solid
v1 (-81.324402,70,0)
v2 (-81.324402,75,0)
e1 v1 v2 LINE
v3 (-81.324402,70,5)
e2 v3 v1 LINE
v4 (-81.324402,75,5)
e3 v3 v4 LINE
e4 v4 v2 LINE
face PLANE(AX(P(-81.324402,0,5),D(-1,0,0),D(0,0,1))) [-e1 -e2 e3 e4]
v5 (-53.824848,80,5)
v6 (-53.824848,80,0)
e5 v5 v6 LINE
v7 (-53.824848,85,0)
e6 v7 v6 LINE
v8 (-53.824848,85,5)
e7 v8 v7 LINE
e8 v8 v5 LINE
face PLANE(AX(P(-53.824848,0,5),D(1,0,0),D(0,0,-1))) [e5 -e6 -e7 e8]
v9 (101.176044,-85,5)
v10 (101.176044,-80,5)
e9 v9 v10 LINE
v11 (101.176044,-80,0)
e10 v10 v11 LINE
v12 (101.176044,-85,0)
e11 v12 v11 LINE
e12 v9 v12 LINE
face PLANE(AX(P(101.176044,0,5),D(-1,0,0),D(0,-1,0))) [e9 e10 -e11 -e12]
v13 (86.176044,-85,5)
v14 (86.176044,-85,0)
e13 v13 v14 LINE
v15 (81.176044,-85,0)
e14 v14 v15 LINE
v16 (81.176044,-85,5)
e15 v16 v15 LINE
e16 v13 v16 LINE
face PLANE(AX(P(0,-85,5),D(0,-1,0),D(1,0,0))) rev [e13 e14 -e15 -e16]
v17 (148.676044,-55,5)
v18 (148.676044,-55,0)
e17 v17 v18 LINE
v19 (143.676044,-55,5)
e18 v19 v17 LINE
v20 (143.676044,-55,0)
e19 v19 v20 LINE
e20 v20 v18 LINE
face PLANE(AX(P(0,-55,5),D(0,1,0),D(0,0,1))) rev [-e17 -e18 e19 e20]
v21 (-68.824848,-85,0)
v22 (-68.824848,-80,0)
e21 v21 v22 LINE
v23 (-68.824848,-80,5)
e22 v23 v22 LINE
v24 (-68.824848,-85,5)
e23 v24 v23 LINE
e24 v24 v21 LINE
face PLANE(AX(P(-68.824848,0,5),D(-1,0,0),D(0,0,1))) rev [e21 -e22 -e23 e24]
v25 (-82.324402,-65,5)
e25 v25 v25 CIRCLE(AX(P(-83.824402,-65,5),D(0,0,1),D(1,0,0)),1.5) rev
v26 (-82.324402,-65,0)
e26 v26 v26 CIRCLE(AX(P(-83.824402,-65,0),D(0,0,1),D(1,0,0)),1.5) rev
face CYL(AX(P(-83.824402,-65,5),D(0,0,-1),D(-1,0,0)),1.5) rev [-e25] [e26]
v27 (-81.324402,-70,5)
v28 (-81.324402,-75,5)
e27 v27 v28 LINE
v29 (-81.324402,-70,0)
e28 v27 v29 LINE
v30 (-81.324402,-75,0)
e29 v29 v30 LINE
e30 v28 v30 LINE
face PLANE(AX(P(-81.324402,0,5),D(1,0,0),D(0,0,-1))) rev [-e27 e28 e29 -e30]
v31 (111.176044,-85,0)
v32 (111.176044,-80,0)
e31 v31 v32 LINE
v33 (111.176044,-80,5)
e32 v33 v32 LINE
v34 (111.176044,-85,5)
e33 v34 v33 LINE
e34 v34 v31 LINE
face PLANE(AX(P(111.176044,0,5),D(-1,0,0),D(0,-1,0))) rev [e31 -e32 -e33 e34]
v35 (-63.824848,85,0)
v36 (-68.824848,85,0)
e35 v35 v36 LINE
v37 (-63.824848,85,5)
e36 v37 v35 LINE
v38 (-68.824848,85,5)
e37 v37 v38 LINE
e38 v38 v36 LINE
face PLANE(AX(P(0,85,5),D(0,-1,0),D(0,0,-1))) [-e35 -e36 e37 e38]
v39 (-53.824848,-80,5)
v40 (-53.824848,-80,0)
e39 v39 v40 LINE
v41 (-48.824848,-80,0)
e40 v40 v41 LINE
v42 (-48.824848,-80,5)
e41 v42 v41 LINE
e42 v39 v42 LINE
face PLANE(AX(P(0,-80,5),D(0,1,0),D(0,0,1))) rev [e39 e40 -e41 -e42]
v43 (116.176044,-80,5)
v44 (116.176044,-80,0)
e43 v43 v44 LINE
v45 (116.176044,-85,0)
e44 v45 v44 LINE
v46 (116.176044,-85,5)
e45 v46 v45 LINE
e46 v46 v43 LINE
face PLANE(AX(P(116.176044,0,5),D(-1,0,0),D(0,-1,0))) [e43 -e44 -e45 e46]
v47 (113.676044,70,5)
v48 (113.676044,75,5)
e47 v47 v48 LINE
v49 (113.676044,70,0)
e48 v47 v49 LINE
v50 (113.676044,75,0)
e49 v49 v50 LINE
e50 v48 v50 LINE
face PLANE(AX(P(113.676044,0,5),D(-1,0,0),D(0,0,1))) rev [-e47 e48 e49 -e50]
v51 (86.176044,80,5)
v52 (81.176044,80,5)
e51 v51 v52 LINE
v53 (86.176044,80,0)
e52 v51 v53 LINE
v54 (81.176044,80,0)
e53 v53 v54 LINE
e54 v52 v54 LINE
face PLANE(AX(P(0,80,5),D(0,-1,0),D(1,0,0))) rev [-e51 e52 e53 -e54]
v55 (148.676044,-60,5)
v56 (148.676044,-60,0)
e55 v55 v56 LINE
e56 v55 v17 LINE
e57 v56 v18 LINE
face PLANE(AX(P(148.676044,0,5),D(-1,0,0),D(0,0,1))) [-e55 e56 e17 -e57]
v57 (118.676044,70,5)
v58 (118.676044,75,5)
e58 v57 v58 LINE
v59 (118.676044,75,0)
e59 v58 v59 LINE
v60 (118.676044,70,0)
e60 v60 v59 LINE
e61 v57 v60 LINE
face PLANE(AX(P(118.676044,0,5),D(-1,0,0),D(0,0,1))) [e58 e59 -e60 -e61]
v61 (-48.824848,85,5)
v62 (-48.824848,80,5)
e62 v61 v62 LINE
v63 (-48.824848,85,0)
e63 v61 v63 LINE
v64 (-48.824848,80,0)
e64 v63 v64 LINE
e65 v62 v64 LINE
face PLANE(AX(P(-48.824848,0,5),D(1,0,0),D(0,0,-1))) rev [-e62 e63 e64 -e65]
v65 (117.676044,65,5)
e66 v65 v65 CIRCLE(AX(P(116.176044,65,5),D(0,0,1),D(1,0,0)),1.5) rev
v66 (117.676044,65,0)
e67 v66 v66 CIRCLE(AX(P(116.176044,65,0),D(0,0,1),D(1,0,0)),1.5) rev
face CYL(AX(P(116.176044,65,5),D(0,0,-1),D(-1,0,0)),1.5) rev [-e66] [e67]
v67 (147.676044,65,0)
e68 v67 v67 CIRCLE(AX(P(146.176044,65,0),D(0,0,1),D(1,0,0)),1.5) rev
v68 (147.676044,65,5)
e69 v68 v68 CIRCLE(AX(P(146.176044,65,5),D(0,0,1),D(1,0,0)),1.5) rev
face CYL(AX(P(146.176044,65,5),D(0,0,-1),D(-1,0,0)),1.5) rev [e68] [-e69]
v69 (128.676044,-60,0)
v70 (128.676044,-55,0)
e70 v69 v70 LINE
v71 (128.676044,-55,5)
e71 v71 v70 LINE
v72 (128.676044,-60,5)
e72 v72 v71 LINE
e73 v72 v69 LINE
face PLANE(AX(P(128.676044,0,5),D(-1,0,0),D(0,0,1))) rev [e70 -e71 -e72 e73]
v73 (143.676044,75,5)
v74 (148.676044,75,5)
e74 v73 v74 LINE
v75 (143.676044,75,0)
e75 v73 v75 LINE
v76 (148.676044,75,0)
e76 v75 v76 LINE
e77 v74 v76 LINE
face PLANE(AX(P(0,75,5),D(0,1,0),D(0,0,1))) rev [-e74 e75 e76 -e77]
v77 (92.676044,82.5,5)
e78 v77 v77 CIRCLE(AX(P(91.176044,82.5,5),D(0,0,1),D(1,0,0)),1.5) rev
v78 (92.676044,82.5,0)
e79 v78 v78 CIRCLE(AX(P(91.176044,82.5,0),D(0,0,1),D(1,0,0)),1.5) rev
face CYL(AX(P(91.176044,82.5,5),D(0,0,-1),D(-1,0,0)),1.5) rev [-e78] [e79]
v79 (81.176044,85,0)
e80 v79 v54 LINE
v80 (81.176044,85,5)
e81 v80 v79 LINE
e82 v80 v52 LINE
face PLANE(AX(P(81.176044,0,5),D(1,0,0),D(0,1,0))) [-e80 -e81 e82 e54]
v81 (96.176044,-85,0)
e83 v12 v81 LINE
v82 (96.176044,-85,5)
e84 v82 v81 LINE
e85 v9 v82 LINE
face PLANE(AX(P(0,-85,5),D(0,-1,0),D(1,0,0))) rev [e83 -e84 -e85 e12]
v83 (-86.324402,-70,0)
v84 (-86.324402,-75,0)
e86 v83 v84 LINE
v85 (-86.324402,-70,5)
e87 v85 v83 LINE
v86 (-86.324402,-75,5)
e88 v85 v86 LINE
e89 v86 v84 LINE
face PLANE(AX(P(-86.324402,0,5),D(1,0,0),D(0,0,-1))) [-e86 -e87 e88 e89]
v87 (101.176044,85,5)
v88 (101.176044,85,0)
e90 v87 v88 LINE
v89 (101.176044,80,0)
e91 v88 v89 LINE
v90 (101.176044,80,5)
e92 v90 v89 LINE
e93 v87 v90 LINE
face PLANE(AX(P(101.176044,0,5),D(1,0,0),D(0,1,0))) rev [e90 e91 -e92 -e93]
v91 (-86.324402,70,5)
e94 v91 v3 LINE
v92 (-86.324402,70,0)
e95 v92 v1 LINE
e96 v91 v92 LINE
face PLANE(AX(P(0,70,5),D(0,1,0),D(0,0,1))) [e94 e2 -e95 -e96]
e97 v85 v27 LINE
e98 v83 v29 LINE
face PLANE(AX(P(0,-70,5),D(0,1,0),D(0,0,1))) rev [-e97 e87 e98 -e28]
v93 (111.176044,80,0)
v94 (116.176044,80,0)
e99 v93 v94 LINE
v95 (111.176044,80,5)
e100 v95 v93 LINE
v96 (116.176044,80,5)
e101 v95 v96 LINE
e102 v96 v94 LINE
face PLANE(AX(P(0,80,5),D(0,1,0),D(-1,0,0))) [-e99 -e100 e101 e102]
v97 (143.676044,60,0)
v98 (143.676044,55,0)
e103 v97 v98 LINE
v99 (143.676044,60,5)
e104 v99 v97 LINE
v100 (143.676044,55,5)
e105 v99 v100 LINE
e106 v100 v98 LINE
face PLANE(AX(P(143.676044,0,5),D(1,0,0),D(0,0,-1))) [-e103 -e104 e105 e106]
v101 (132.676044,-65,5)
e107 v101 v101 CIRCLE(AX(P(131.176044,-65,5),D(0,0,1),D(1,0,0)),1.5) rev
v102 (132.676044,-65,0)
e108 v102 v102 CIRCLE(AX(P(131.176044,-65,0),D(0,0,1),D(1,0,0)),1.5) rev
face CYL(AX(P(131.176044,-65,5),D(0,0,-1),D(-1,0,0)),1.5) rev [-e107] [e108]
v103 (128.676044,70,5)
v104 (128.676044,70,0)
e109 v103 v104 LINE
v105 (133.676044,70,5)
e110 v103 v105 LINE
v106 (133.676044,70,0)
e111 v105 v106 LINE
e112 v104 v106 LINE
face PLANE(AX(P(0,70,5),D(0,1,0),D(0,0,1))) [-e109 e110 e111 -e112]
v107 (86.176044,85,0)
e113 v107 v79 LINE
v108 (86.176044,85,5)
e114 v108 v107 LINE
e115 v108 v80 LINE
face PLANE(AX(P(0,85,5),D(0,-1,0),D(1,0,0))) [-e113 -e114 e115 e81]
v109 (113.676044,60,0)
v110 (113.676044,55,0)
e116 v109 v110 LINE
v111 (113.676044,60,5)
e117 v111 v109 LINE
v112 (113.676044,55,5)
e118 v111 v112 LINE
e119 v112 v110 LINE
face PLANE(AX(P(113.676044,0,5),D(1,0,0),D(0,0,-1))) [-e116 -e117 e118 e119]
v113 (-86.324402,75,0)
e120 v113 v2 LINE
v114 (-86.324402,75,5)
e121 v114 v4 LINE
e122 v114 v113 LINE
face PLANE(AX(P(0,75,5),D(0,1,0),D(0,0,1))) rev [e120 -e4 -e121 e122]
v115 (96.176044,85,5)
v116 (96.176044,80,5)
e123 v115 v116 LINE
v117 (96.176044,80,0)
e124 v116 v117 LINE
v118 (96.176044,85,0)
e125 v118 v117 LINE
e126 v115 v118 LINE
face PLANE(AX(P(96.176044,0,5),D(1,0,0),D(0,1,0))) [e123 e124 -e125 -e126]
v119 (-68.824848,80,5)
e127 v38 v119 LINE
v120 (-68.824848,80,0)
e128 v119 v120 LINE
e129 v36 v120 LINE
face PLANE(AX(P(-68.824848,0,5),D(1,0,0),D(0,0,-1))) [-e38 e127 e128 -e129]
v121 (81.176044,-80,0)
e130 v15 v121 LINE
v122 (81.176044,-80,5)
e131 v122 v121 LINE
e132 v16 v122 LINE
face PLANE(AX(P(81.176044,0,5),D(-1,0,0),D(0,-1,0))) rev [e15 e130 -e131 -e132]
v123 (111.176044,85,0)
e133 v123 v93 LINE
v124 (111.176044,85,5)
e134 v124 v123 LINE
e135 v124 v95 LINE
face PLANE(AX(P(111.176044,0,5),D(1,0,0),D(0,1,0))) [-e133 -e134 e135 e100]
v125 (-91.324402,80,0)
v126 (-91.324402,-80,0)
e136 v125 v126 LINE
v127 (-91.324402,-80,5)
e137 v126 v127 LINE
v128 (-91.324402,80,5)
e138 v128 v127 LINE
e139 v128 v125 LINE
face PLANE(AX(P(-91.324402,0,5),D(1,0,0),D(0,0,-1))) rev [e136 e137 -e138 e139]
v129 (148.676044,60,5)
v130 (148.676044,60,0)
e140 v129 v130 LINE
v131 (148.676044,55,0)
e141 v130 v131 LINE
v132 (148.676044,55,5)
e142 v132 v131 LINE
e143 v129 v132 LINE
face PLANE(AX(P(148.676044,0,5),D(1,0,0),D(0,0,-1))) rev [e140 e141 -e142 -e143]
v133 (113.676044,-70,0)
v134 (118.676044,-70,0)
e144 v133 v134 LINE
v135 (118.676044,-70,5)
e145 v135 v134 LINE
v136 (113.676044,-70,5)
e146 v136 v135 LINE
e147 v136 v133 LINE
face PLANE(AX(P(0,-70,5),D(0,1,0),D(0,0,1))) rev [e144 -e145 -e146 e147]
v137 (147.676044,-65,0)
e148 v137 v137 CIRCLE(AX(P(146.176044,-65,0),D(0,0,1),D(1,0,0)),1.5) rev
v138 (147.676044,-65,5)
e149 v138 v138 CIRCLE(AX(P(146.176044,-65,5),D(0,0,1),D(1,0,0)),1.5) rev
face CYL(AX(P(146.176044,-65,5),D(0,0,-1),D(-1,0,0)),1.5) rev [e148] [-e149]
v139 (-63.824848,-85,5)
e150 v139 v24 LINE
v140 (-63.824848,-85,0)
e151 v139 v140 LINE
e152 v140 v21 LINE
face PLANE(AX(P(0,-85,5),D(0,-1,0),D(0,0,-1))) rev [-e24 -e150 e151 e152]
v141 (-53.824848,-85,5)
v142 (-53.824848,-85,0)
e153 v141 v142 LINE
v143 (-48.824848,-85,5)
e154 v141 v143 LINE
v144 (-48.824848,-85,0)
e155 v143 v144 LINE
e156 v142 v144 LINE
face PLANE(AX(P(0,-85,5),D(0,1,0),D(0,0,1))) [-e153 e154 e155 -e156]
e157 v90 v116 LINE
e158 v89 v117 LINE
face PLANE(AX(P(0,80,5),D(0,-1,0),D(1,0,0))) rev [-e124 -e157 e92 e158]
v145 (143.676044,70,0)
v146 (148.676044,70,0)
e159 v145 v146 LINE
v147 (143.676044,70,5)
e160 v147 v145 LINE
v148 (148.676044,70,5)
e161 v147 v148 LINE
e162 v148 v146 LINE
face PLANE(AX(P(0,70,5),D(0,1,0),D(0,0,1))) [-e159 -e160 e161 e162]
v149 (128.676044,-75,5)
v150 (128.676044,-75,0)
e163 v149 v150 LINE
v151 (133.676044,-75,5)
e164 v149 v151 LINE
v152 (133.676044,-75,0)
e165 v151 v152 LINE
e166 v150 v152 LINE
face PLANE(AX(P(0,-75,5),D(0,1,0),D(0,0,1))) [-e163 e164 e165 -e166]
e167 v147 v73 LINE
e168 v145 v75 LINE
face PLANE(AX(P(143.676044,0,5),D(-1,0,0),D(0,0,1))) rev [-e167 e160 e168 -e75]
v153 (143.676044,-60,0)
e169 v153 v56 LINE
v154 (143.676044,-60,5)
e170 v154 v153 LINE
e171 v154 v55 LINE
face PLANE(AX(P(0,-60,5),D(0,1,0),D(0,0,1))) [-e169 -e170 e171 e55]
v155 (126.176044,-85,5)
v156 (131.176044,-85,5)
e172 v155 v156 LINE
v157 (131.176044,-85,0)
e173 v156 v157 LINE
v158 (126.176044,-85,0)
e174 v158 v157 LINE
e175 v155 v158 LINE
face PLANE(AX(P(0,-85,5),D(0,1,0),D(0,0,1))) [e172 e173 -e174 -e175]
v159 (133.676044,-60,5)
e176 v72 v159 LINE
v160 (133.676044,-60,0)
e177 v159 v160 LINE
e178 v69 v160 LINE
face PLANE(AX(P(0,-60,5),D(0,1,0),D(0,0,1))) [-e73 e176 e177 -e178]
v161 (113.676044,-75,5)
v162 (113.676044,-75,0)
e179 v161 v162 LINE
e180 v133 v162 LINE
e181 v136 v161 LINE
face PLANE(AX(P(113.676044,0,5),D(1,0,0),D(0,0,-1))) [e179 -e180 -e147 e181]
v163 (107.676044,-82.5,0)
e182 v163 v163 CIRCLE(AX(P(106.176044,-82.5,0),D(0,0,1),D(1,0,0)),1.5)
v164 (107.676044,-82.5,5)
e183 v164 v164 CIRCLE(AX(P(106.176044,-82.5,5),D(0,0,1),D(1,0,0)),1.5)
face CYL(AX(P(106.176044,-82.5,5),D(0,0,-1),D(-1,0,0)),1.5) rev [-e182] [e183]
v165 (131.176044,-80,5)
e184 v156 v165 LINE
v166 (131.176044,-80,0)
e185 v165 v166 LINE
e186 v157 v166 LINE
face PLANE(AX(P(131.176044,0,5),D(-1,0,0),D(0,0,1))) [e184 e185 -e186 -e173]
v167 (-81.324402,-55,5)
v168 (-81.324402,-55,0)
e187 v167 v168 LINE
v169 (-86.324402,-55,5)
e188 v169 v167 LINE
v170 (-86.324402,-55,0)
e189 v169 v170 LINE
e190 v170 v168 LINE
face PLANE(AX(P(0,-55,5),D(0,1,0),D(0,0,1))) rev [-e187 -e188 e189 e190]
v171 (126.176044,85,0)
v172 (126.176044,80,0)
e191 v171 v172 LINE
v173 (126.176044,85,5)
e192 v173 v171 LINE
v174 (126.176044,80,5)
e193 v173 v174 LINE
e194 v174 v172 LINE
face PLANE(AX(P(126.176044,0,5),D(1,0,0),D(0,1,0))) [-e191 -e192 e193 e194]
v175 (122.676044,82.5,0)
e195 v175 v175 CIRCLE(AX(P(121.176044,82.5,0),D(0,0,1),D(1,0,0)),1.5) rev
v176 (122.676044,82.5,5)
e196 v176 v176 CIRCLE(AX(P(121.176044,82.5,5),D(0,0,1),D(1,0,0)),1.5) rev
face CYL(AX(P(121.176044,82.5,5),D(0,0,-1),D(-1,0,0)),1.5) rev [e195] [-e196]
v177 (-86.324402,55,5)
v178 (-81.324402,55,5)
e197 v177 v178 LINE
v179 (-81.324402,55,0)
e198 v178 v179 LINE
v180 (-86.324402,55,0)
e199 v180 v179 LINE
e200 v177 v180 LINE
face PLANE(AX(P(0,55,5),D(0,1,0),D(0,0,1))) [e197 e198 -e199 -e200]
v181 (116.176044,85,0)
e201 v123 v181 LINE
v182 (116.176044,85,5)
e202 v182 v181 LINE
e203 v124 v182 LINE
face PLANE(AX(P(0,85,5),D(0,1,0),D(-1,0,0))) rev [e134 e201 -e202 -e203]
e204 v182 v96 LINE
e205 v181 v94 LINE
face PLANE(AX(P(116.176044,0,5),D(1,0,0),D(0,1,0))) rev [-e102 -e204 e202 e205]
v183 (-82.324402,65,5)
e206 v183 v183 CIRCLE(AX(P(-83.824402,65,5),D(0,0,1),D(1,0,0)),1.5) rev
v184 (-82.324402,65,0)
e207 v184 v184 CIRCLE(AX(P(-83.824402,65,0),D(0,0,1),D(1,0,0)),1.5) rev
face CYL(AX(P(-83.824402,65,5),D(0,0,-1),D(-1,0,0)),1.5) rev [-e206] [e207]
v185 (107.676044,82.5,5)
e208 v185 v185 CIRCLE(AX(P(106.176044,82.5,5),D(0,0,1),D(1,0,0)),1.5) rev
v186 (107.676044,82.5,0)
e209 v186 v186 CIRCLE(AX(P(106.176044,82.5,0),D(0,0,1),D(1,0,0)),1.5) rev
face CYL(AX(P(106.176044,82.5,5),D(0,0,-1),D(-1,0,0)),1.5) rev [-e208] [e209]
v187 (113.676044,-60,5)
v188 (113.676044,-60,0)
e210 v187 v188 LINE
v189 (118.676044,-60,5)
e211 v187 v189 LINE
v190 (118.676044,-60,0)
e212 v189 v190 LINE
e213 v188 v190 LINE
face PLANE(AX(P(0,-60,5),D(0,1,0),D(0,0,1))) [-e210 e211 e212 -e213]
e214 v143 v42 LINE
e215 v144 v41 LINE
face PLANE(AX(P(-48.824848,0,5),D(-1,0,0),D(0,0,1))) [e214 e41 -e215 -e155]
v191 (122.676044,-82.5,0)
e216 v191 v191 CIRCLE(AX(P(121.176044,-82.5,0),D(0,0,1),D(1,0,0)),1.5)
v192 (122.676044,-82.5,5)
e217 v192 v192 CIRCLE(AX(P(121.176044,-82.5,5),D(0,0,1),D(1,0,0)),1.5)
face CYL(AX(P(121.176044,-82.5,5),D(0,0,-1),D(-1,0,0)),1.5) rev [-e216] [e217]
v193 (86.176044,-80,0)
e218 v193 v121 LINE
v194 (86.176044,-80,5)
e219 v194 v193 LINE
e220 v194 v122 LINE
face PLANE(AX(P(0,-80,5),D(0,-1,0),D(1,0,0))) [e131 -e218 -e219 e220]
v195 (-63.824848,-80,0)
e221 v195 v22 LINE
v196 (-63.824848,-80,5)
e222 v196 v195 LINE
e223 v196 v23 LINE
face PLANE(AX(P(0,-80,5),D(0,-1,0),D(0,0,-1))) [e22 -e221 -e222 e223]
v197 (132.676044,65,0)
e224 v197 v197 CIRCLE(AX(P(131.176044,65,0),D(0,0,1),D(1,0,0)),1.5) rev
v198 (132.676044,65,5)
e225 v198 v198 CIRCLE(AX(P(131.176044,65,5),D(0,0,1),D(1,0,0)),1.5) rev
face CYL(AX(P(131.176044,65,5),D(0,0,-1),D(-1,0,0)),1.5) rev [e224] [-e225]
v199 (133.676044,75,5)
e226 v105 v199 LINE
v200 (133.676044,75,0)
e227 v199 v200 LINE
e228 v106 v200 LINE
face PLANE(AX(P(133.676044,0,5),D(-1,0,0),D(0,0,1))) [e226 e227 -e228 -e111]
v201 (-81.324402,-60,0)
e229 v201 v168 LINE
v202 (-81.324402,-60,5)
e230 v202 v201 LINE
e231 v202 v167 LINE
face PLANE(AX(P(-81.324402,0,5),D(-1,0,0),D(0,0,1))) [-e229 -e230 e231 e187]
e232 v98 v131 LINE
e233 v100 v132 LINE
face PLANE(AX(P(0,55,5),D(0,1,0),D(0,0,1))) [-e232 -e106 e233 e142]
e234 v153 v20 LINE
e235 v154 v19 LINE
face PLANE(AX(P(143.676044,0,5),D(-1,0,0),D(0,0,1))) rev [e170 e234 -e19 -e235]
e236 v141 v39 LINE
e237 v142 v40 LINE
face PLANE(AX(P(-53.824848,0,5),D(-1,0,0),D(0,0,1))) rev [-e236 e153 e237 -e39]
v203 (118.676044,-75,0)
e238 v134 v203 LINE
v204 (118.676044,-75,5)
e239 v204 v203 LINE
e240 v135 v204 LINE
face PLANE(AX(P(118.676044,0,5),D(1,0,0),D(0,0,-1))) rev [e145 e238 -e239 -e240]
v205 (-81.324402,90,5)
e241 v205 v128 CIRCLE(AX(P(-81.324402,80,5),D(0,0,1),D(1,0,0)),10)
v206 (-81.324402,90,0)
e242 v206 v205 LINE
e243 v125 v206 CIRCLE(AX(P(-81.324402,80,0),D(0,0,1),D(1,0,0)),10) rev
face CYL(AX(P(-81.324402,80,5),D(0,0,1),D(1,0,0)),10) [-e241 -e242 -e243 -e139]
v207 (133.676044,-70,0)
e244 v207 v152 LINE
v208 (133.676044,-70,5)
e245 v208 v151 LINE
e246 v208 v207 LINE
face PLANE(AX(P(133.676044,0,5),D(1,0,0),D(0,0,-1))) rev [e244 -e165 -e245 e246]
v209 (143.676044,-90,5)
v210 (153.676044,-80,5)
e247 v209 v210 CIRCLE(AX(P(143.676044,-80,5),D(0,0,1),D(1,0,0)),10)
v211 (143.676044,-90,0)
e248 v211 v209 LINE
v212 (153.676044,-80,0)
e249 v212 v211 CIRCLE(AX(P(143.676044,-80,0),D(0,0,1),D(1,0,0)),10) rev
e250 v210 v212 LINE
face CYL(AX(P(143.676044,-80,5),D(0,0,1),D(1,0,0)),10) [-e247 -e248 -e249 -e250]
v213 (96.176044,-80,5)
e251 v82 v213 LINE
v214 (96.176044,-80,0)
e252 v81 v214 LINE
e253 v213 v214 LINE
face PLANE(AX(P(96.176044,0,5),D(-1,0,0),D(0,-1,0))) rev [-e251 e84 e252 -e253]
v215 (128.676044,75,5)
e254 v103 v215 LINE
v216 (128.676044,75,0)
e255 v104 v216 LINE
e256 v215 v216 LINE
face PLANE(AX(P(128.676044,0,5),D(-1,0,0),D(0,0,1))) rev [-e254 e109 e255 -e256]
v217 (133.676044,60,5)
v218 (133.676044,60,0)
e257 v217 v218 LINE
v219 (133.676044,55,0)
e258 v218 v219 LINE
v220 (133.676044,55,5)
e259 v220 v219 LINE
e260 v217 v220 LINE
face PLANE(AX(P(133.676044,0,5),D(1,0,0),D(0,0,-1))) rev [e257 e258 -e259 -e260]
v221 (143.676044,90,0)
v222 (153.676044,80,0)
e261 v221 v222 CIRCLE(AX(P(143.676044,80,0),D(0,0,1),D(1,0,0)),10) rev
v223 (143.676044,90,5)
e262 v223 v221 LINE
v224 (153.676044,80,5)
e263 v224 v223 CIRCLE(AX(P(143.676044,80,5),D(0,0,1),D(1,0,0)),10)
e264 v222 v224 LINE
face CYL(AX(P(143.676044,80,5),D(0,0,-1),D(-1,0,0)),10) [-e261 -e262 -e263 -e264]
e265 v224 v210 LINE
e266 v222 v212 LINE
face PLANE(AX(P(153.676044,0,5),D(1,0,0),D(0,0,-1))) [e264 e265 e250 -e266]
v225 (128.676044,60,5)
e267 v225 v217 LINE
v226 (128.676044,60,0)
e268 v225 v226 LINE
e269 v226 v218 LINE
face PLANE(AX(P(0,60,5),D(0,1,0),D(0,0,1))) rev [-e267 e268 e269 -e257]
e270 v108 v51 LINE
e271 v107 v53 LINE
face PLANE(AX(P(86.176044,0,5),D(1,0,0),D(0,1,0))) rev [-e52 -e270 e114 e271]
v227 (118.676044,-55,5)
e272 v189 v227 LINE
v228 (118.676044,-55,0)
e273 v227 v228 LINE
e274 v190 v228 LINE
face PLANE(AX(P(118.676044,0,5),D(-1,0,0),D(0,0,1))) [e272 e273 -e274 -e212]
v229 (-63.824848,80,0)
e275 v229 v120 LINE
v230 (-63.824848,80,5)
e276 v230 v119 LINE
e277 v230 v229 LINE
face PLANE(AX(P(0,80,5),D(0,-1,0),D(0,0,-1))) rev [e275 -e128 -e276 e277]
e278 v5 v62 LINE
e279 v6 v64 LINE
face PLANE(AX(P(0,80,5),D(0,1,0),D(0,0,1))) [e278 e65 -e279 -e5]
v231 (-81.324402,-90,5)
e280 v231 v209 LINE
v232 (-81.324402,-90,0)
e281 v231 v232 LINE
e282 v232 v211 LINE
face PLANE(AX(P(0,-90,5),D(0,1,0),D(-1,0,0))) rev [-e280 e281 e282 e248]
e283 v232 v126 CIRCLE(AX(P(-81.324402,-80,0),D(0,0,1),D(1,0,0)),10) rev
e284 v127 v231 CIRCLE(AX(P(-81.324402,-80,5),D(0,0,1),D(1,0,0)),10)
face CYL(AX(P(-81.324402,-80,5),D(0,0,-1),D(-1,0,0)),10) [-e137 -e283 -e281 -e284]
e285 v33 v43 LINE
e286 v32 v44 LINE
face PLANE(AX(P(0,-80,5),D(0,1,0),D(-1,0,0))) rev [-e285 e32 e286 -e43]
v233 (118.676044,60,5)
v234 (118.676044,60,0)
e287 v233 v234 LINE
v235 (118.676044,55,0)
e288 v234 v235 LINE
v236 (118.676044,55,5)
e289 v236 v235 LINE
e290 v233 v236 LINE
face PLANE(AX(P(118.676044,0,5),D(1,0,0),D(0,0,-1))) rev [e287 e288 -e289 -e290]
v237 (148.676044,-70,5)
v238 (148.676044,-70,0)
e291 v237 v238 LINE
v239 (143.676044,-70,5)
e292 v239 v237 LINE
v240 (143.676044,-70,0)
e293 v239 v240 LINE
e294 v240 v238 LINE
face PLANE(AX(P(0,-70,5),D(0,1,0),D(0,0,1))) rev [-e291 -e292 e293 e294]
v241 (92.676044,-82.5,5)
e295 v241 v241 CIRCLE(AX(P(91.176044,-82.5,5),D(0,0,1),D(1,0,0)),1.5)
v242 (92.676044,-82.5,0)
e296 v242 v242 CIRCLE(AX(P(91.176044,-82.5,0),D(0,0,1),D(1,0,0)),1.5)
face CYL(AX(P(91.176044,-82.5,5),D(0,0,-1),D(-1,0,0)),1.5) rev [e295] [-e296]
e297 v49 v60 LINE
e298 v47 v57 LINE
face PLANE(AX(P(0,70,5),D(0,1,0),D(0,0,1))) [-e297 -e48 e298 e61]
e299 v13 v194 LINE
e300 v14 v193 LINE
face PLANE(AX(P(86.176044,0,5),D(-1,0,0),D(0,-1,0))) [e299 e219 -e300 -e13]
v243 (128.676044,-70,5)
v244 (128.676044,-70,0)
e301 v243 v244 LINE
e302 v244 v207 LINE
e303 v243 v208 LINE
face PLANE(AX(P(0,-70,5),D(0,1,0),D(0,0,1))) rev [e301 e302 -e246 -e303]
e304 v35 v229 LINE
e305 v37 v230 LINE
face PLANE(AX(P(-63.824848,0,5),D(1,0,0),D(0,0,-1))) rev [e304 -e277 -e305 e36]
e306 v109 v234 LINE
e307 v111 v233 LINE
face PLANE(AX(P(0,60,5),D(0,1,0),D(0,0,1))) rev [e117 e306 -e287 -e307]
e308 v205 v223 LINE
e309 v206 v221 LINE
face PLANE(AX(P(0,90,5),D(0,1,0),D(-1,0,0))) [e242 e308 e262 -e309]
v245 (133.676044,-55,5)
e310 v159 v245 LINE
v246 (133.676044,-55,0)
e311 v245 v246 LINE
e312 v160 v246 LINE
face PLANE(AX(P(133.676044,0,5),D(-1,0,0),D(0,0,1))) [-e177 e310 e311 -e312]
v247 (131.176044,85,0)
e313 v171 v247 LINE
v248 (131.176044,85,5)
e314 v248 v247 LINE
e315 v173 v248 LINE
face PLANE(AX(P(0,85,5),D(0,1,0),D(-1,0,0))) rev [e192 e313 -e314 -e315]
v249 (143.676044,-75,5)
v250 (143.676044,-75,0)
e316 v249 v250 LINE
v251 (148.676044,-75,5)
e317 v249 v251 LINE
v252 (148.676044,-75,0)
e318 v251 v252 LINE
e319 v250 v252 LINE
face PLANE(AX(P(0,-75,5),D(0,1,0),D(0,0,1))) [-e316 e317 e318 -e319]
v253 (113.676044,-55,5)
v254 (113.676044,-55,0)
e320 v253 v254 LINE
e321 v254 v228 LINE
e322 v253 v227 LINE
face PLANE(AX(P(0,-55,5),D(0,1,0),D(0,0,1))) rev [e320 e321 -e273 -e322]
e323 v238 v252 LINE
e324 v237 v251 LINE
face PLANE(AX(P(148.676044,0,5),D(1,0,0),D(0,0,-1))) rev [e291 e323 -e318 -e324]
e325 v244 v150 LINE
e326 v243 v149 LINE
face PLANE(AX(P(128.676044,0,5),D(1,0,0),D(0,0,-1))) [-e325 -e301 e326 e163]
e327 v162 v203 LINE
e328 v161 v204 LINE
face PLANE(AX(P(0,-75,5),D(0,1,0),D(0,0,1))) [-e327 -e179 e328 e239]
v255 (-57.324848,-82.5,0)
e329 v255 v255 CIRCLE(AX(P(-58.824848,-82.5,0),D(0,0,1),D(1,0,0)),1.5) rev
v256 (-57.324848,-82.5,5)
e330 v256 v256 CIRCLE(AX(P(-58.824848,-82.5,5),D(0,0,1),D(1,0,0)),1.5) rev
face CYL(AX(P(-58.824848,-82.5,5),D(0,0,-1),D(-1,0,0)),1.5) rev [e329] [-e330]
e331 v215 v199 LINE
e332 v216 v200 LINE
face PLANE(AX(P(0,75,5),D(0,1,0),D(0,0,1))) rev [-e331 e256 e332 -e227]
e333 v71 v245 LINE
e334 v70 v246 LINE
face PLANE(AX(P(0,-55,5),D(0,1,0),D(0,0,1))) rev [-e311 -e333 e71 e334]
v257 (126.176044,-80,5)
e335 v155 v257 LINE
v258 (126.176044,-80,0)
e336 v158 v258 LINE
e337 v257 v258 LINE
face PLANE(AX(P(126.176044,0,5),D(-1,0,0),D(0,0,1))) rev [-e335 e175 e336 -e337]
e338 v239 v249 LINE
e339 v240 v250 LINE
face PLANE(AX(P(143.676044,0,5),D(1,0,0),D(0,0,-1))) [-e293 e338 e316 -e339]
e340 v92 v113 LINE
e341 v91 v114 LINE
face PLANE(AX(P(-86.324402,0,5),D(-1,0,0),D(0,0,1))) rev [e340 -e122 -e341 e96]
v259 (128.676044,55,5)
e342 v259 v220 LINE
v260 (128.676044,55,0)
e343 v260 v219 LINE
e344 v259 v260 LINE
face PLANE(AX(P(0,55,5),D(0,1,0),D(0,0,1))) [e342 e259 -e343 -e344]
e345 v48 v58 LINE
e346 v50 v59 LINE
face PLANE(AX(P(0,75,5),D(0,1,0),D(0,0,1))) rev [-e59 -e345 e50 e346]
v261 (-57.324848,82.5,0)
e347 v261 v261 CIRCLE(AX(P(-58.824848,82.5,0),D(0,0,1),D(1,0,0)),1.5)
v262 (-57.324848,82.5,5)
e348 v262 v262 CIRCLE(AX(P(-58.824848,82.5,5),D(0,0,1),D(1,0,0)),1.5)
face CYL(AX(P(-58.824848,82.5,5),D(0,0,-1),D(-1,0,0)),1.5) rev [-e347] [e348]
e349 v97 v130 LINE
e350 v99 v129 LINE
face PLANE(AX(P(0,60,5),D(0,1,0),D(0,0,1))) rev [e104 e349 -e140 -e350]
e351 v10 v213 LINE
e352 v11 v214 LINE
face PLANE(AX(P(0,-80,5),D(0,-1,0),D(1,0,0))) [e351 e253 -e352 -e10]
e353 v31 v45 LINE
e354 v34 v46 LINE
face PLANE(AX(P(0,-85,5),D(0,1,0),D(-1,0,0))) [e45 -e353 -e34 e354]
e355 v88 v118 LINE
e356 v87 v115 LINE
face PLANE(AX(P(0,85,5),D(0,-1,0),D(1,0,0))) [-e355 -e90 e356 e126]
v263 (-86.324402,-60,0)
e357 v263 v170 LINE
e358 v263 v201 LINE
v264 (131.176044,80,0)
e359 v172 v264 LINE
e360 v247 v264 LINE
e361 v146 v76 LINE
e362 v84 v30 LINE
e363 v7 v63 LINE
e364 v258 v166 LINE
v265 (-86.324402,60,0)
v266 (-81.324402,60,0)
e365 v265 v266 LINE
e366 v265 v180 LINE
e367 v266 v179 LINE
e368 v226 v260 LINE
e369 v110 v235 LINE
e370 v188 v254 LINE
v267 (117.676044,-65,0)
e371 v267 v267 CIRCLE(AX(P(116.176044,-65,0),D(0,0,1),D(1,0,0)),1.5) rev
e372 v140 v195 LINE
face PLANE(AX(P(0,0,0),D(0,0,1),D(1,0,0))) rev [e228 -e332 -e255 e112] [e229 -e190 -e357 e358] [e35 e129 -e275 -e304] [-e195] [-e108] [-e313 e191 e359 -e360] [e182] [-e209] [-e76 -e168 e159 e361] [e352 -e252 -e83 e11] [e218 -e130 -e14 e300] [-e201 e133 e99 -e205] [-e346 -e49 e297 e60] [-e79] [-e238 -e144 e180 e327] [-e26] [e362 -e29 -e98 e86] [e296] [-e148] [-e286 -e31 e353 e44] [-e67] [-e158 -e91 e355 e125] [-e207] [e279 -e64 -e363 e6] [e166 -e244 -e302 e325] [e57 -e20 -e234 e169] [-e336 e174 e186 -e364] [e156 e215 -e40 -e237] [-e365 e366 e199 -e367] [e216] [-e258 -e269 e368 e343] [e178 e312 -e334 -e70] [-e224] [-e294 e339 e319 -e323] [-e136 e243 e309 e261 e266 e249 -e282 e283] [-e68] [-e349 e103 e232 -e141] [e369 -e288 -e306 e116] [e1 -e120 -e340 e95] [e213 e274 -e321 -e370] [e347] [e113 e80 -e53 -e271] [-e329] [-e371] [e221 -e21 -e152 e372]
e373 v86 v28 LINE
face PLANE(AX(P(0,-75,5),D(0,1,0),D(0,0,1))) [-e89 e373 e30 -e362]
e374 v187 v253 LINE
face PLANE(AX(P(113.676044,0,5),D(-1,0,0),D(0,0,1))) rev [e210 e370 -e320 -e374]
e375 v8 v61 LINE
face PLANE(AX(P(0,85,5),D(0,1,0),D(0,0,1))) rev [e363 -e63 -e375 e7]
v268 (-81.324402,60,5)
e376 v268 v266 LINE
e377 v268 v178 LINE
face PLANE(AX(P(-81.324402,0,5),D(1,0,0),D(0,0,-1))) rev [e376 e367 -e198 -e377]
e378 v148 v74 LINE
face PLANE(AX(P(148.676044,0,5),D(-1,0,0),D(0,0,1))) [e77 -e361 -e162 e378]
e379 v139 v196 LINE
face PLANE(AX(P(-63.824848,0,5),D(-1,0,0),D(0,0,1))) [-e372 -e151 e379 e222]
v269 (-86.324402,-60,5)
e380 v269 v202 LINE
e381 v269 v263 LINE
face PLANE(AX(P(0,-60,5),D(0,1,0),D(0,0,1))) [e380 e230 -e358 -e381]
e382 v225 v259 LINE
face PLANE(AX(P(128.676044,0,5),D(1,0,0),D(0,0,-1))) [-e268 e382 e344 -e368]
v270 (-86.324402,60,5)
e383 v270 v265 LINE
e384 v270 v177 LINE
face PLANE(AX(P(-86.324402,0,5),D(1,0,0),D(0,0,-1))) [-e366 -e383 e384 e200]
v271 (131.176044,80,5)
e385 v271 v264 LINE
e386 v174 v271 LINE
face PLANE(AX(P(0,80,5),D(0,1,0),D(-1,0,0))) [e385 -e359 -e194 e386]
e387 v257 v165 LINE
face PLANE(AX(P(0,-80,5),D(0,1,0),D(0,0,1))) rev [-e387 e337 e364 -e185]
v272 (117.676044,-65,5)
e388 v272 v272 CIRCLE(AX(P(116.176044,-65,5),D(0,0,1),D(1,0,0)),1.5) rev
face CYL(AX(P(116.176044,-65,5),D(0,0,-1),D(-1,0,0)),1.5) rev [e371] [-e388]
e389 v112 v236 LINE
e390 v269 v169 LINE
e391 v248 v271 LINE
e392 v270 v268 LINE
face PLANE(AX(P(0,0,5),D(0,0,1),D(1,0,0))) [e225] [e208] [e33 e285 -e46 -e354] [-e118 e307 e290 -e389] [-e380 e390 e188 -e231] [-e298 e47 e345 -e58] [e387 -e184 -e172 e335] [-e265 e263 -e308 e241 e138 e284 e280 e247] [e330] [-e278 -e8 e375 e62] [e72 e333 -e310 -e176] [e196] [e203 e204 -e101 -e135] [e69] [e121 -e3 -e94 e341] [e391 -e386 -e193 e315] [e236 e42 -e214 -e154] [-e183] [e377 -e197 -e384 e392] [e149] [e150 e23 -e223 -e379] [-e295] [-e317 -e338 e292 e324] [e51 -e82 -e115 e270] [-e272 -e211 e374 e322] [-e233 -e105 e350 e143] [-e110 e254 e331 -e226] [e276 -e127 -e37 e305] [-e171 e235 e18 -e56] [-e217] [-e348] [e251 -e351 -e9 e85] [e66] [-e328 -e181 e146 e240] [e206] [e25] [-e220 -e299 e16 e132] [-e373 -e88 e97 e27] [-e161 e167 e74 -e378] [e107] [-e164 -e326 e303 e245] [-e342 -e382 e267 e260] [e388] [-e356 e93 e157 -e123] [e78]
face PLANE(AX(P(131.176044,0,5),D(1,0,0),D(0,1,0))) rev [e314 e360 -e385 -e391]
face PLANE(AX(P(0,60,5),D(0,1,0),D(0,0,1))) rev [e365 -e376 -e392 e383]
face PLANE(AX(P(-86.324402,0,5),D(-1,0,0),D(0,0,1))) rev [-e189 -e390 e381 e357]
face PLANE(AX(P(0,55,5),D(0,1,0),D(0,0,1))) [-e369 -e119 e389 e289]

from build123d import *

# Parameters (mm, degrees)
BOSS_EXTRUDE1_OUTLINE_W   = 245.000446045
BOSS_EXTRUDE1_OUTLINE_H   = 180
BOSS_EXTRUDE1_OUTLINE_W_2 = 5
BOSS_EXTRUDE1_OUTLINE_H_2 = 5
BOSS_EXTRUDE1_OUTLINE_R   = 1.5
BOSS_EXTRUDE1_DEPTH       = 5
FILLET1_R                 = 10


# Read off the part's stored shape, not the designer's step: Boss-Extrude1
with BuildPart() as part:
    # Boss-Extrude1 outline → Boss-Extrude1 (new body)
    with BuildSketch(Plane.XY):
        with Locations((31.175821468, 0)):
            Rectangle(BOSS_EXTRUDE1_OUTLINE_W, BOSS_EXTRUDE1_OUTLINE_H)
        with Locations((-66.324847601, -82.5)):
            Rectangle(BOSS_EXTRUDE1_OUTLINE_W_2, BOSS_EXTRUDE1_OUTLINE_H_2, mode=Mode.SUBTRACT)
        with Locations((-83.824401555, -72.5)):
            Rectangle(BOSS_EXTRUDE1_OUTLINE_W_2, BOSS_EXTRUDE1_OUTLINE_H_2, mode=Mode.SUBTRACT)
        with Locations((-58.824847601, -82.5)):
            Circle(BOSS_EXTRUDE1_OUTLINE_R, mode=Mode.SUBTRACT)
        with Locations((-51.324847601, -82.5)):
            Rectangle(BOSS_EXTRUDE1_OUTLINE_W_2, BOSS_EXTRUDE1_OUTLINE_H_2, mode=Mode.SUBTRACT)
        with Locations((-83.824401555, -65)):
            Circle(BOSS_EXTRUDE1_OUTLINE_R, mode=Mode.SUBTRACT)
        with Locations((-83.824401555, -57.5)):
            Rectangle(BOSS_EXTRUDE1_OUTLINE_W_2, BOSS_EXTRUDE1_OUTLINE_H_2, mode=Mode.SUBTRACT)
        with Locations((83.67604449, -82.5)):
            Rectangle(BOSS_EXTRUDE1_OUTLINE_W_2, BOSS_EXTRUDE1_OUTLINE_H_2, mode=Mode.SUBTRACT)
        with Locations((91.17604449, -82.5)):
            Circle(BOSS_EXTRUDE1_OUTLINE_R, mode=Mode.SUBTRACT)
        with Locations((98.67604449, -82.5)):
            Rectangle(BOSS_EXTRUDE1_OUTLINE_W_2, BOSS_EXTRUDE1_OUTLINE_H_2, mode=Mode.SUBTRACT)
        with Locations((106.17604449, -82.5)):
            Circle(BOSS_EXTRUDE1_OUTLINE_R, mode=Mode.SUBTRACT)
        with Locations((113.67604449, -82.5)):
            Rectangle(BOSS_EXTRUDE1_OUTLINE_W_2, BOSS_EXTRUDE1_OUTLINE_H_2, mode=Mode.SUBTRACT)
        with Locations((121.17604449, -82.5)):
            Circle(BOSS_EXTRUDE1_OUTLINE_R, mode=Mode.SUBTRACT)
        with Locations((116.17604449, -72.5)):
            Rectangle(BOSS_EXTRUDE1_OUTLINE_W_2, BOSS_EXTRUDE1_OUTLINE_H_2, mode=Mode.SUBTRACT)
        with Locations((128.67604449, -82.5)):
            Rectangle(BOSS_EXTRUDE1_OUTLINE_W_2, BOSS_EXTRUDE1_OUTLINE_H_2, mode=Mode.SUBTRACT)
        with Locations((131.17604449, -72.5)):
            Rectangle(BOSS_EXTRUDE1_OUTLINE_W_2, BOSS_EXTRUDE1_OUTLINE_H_2, mode=Mode.SUBTRACT)
        with Locations((146.17604449, -72.5)):
            Rectangle(BOSS_EXTRUDE1_OUTLINE_W_2, BOSS_EXTRUDE1_OUTLINE_H_2, mode=Mode.SUBTRACT)
        with Locations((116.17604449, -65)):
            Circle(BOSS_EXTRUDE1_OUTLINE_R, mode=Mode.SUBTRACT)
        with Locations((116.17604449, -57.5)):
            Rectangle(BOSS_EXTRUDE1_OUTLINE_W_2, BOSS_EXTRUDE1_OUTLINE_H_2, mode=Mode.SUBTRACT)
        with Locations((131.17604449, -65)):
            Circle(BOSS_EXTRUDE1_OUTLINE_R, mode=Mode.SUBTRACT)
        with Locations((131.17604449, -57.5)):
            Rectangle(BOSS_EXTRUDE1_OUTLINE_W_2, BOSS_EXTRUDE1_OUTLINE_H_2, mode=Mode.SUBTRACT)
        with Locations((146.17604449, -65)):
            Circle(BOSS_EXTRUDE1_OUTLINE_R, mode=Mode.SUBTRACT)
        with Locations((146.17604449, -57.5)):
            Rectangle(BOSS_EXTRUDE1_OUTLINE_W_2, BOSS_EXTRUDE1_OUTLINE_H_2, mode=Mode.SUBTRACT)
        with Locations((-83.824401555, 57.5)):
            Rectangle(BOSS_EXTRUDE1_OUTLINE_W_2, BOSS_EXTRUDE1_OUTLINE_H_2, mode=Mode.SUBTRACT)
        with Locations((-83.824401555, 65)):
            Circle(BOSS_EXTRUDE1_OUTLINE_R, mode=Mode.SUBTRACT)
        with Locations((-83.824401555, 72.5)):
            Rectangle(BOSS_EXTRUDE1_OUTLINE_W_2, BOSS_EXTRUDE1_OUTLINE_H_2, mode=Mode.SUBTRACT)
        with Locations((-66.324847601, 82.5)):
            Rectangle(BOSS_EXTRUDE1_OUTLINE_W_2, BOSS_EXTRUDE1_OUTLINE_H_2, mode=Mode.SUBTRACT)
        with Locations((-58.824847601, 82.5)):
            Circle(BOSS_EXTRUDE1_OUTLINE_R, mode=Mode.SUBTRACT)
        with Locations((-51.324847601, 82.5)):
            Rectangle(BOSS_EXTRUDE1_OUTLINE_W_2, BOSS_EXTRUDE1_OUTLINE_H_2, mode=Mode.SUBTRACT)
        with Locations((83.676044481, 82.5)):
            Rectangle(BOSS_EXTRUDE1_OUTLINE_W_2, BOSS_EXTRUDE1_OUTLINE_H_2, mode=Mode.SUBTRACT)
        with Locations((91.176044481, 82.5)):
            Circle(BOSS_EXTRUDE1_OUTLINE_R, mode=Mode.SUBTRACT)
        with Locations((116.17604449, 57.5)):
            Rectangle(BOSS_EXTRUDE1_OUTLINE_W_2, BOSS_EXTRUDE1_OUTLINE_H_2, mode=Mode.SUBTRACT)
        with Locations((116.17604449, 65)):
            Circle(BOSS_EXTRUDE1_OUTLINE_R, mode=Mode.SUBTRACT)
        with Locations((131.17604449, 57.5)):
            Rectangle(BOSS_EXTRUDE1_OUTLINE_W_2, BOSS_EXTRUDE1_OUTLINE_H_2, mode=Mode.SUBTRACT)
        with Locations((131.17604449, 65)):
            Circle(BOSS_EXTRUDE1_OUTLINE_R, mode=Mode.SUBTRACT)
        with Locations((146.17604449, 57.5)):
            Rectangle(BOSS_EXTRUDE1_OUTLINE_W_2, BOSS_EXTRUDE1_OUTLINE_H_2, mode=Mode.SUBTRACT)
        with Locations((146.17604449, 65)):
            Circle(BOSS_EXTRUDE1_OUTLINE_R, mode=Mode.SUBTRACT)
        with Locations((116.17604449, 72.5)):
            Rectangle(BOSS_EXTRUDE1_OUTLINE_W_2, BOSS_EXTRUDE1_OUTLINE_H_2, mode=Mode.SUBTRACT)
        with Locations((98.67604449, 82.5)):
            Rectangle(BOSS_EXTRUDE1_OUTLINE_W_2, BOSS_EXTRUDE1_OUTLINE_H_2, mode=Mode.SUBTRACT)
        with Locations((106.17604449, 82.5)):
            Circle(BOSS_EXTRUDE1_OUTLINE_R, mode=Mode.SUBTRACT)
        with Locations((113.67604449, 82.5)):
            Rectangle(BOSS_EXTRUDE1_OUTLINE_W_2, BOSS_EXTRUDE1_OUTLINE_H_2, mode=Mode.SUBTRACT)
        with Locations((121.17604449, 82.5)):
            Circle(BOSS_EXTRUDE1_OUTLINE_R, mode=Mode.SUBTRACT)
        with Locations((131.17604449, 72.5)):
            Rectangle(BOSS_EXTRUDE1_OUTLINE_W_2, BOSS_EXTRUDE1_OUTLINE_H_2, mode=Mode.SUBTRACT)
        with Locations((146.17604449, 72.5)):
            Rectangle(BOSS_EXTRUDE1_OUTLINE_W_2, BOSS_EXTRUDE1_OUTLINE_H_2, mode=Mode.SUBTRACT)
        with Locations((128.67604449, 82.5)):
            Rectangle(BOSS_EXTRUDE1_OUTLINE_W_2, BOSS_EXTRUDE1_OUTLINE_H_2, mode=Mode.SUBTRACT)
    extrude(amount=BOSS_EXTRUDE1_DEPTH)

    # Fillet1
    fillet1_edges = [part.edges().sort_by_distance(p)[0] for p in [
        (153.67604449, -90, 2.5),
        (-91.324401555, -90, 2.5),
        (-91.324401555, 90, 2.5),
        (153.67604449, 90, 2.5),
    ]]
    fillet(fillet1_edges, radius=FILLET1_R)


solid = part.part
